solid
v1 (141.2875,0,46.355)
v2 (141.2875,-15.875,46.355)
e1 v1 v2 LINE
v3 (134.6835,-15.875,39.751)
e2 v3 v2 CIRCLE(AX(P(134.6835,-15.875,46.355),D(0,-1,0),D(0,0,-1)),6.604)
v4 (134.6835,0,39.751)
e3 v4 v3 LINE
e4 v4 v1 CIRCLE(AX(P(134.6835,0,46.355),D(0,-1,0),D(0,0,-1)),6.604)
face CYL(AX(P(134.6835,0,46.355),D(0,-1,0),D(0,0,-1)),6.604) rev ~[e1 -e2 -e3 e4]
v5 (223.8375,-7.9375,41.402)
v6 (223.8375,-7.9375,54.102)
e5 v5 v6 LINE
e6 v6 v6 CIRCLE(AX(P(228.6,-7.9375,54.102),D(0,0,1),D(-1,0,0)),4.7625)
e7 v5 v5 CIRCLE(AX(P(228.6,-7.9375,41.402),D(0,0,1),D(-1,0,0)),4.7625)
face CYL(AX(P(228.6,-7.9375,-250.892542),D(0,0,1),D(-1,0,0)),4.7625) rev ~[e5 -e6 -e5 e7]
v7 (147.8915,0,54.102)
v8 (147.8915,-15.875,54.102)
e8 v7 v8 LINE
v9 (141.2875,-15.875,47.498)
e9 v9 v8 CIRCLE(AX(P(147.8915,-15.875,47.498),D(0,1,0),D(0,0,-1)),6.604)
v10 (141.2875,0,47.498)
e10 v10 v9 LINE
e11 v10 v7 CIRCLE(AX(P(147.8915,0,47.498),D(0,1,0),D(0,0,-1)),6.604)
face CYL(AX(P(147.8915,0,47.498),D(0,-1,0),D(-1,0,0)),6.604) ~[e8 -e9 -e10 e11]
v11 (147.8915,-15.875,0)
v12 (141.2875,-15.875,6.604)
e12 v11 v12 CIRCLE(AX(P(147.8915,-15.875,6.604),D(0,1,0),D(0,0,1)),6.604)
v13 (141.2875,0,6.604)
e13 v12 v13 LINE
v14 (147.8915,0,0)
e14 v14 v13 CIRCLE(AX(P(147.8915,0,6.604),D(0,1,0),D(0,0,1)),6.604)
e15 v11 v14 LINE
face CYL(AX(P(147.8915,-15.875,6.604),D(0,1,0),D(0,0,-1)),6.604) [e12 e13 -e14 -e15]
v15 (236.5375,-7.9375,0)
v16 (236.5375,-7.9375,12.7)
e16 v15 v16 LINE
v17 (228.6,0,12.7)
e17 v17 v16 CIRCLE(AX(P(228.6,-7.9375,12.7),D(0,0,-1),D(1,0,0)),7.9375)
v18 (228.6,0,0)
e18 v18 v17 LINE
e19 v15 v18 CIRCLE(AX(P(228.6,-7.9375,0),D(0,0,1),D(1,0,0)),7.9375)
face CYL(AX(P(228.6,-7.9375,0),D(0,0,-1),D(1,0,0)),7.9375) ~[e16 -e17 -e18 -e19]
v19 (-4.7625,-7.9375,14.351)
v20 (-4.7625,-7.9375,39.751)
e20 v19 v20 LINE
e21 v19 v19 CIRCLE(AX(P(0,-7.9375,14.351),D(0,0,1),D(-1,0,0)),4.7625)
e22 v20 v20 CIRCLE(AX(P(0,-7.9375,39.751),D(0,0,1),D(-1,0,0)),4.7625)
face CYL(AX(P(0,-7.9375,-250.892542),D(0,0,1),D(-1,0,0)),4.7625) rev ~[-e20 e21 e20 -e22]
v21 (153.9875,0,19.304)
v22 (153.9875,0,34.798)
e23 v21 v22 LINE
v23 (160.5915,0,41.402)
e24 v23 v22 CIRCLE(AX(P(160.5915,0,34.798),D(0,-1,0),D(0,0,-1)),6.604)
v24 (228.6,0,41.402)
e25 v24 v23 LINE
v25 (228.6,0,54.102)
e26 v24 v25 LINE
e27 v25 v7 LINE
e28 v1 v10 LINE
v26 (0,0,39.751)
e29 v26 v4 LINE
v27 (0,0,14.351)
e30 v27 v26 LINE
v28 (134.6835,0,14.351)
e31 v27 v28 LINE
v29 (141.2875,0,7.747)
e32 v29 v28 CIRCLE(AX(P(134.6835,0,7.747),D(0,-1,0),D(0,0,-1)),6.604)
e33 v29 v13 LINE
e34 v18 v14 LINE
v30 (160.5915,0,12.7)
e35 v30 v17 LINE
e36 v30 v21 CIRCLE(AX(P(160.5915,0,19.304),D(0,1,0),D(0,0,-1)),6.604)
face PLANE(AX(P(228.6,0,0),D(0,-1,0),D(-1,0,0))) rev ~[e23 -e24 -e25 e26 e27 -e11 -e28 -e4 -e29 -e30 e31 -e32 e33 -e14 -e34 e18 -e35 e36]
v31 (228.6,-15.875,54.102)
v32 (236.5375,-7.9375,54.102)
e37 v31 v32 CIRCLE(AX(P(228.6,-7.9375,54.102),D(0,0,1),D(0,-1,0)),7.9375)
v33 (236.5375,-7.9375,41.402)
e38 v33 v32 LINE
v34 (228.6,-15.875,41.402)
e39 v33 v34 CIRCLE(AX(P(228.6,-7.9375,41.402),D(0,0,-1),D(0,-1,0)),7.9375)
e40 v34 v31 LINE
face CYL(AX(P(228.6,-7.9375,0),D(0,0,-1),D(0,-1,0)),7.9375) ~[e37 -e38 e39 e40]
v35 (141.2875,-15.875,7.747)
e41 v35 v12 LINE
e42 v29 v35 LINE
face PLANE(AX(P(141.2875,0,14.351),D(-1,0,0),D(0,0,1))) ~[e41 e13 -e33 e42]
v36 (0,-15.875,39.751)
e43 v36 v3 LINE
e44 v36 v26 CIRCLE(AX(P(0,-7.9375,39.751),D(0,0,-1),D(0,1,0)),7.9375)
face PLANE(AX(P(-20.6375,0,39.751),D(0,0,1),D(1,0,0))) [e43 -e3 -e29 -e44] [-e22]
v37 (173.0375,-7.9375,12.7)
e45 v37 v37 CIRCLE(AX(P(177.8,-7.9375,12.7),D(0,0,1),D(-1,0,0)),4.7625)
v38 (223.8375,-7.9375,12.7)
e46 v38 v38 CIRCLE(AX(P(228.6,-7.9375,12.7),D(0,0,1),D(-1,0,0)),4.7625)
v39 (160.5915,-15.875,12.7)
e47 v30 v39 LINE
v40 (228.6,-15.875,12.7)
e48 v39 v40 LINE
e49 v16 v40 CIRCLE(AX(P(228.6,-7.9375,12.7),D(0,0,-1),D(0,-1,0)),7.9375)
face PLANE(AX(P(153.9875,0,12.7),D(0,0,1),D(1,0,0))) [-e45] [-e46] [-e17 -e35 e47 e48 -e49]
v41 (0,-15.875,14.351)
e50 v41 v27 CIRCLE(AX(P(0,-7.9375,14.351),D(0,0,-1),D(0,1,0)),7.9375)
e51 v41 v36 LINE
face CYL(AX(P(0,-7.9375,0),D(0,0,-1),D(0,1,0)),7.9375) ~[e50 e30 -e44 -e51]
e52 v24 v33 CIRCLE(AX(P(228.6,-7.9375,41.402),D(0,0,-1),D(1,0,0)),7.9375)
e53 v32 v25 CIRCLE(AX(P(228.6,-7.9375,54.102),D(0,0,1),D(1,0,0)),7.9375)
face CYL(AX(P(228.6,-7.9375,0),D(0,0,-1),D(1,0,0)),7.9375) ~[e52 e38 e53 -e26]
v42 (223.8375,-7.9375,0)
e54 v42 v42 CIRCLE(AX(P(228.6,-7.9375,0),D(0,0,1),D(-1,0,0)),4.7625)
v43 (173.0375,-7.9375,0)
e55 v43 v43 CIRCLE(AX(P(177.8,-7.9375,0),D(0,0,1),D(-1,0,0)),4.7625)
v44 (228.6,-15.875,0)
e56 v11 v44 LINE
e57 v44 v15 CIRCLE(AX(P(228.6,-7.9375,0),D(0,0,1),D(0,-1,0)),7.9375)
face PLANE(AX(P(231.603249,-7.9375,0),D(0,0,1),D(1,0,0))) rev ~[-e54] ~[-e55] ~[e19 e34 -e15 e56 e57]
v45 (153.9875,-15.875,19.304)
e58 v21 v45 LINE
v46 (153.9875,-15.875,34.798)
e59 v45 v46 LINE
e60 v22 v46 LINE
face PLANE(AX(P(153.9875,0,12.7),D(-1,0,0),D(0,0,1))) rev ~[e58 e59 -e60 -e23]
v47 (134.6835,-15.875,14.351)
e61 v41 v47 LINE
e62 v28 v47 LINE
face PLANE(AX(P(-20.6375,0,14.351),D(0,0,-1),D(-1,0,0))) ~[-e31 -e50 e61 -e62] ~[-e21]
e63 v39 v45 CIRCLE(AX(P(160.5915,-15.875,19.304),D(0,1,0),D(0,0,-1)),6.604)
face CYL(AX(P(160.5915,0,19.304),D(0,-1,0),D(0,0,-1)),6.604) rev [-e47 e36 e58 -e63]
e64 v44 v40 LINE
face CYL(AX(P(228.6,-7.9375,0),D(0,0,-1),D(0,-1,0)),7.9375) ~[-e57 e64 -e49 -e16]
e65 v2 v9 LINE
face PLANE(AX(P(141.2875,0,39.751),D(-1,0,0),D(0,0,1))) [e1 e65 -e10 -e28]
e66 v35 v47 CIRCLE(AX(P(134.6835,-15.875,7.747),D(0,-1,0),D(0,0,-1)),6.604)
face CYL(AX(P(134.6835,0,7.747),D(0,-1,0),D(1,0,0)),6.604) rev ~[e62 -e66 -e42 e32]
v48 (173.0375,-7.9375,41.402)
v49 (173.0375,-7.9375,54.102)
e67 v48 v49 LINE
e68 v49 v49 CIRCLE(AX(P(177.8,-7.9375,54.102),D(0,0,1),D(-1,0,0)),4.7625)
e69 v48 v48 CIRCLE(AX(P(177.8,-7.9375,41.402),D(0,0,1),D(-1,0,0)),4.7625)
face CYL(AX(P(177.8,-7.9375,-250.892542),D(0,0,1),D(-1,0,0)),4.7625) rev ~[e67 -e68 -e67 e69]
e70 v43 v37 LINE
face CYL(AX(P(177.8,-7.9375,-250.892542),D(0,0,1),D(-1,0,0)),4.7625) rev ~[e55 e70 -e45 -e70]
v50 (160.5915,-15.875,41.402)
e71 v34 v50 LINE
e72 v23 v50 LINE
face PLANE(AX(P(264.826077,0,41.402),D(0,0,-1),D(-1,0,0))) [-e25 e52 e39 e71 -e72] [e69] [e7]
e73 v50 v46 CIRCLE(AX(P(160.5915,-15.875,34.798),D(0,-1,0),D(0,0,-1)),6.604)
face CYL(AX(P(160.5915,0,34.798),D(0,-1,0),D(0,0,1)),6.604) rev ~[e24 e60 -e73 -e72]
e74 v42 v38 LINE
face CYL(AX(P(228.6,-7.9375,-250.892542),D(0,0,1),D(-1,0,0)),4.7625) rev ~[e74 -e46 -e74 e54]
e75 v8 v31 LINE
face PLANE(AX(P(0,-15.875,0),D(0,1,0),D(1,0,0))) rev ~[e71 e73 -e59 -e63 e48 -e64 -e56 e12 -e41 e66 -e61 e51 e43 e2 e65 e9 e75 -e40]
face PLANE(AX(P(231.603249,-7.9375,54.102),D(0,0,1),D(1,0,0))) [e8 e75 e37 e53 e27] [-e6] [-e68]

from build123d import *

# Parameters (mm, degrees)
F1_DEPTH = 54.102
F2_D     = 9.525
F3_W     = 74.6125
F3_H     = 28.702
F3_W_2   = 36.2260771513
F4_W     = 161.925
F4_H     = 27.051
F5_DEPTH = 25.4
F7_R     = 6.604


# Not quite as in the source:
# - a pattern or mirror of a feature is missing from the dataset's text; its kind, count and spacing are read off the source's solid


with BuildPart() as f1:
    # F0 (on Top) → F1 (new body)
    with BuildSketch(Plane.XY):
        with BuildLine():
            ThreePointArc((236.5375, -7.9375), (234.2126600757, -2.3248399243), (228.6, 0))
            Line((228.6, 0), (228.6, -15.875))
            ThreePointArc((228.6, -15.875), (234.2126600757, -13.5501600757), (236.5375, -7.9375))
        make_face()
        with BuildLine():
            Line((228.6, -15.875), (228.6, 0))
            ThreePointArc((228.6, 0), (220.6625, -7.9375), (228.6, -15.875))
        make_face()
        with BuildLine():
            Line((228.6, 0), (0, 0))
            ThreePointArc((0, 0), (5.6126600757, -2.3248399243), (7.9375, -7.9375))
            ThreePointArc((7.9375, -7.9375), (5.6126600757, -13.5501600757), (0, -15.875))
            Line((0, -15.875), (228.6, -15.875))
            ThreePointArc((228.6, -15.875), (220.6625, -7.9375), (228.6, 0))
        make_face()
        with BuildLine():
            ThreePointArc((7.9375, -7.9375), (5.6126600757, -2.3248399243), (0, 0))
            Line((0, 0), (0, -15.875))
            ThreePointArc((0, -15.875), (5.6126600757, -13.5501600757), (7.9375, -7.9375))
        make_face()
        with BuildLine():
            Line((0, -15.875), (0, 0))
            ThreePointArc((0, 0), (-7.9375, -7.9375), (0, -15.875))
        make_face()
    extrude(amount=F1_DEPTH)

    # F2 (through all)
    with Locations(Plane(origin=(0, 0, 0), x_dir=(1, 0, 0), z_dir=(0, 0, -1))):
        with Locations((0, 7.9375), (177.8, 7.9375), (228.6, 7.9375)):
            Hole(F2_D / 2)

    # F3 (on Front) + F4 (on Front) → F5 (cut)
    with BuildSketch(Plane.XZ):
        with Locations((191.29375, 27.051)):
            Rectangle(F3_W, F3_H)
        with Locations((246.7130385756, 27.051)):
            Rectangle(F3_W_2, F3_H)
    with BuildSketch(Plane.XZ):
        with Locations((60.325, 53.2765)):
            Rectangle(F4_W, F4_H)
    f5 = extrude(amount=F5_DEPTH, mode=Mode.SUBTRACT)

    # F5_copies: F5 across plane
    add(f5.mirror(Plane(origin=(0, 0, 27.051), x_dir=(-1, 0, 0), z_dir=(0, 0, -1))), mode=Mode.SUBTRACT)

    # F7
    f7_edges = [f1.edges().sort_by_distance(p)[0] for p in [
        (141.2875, -7.9375, 39.751),
        (141.2875, -7.9375, 54.102),
        (153.9875, -7.9375, 12.7),
        (153.9875, -7.9375, 41.402),
        (141.2875, -7.9375, 0),
        (141.2875, -7.9375, 14.351),
    ]]
    fillet(f7_edges, radius=F7_R)


solid = f1.part
